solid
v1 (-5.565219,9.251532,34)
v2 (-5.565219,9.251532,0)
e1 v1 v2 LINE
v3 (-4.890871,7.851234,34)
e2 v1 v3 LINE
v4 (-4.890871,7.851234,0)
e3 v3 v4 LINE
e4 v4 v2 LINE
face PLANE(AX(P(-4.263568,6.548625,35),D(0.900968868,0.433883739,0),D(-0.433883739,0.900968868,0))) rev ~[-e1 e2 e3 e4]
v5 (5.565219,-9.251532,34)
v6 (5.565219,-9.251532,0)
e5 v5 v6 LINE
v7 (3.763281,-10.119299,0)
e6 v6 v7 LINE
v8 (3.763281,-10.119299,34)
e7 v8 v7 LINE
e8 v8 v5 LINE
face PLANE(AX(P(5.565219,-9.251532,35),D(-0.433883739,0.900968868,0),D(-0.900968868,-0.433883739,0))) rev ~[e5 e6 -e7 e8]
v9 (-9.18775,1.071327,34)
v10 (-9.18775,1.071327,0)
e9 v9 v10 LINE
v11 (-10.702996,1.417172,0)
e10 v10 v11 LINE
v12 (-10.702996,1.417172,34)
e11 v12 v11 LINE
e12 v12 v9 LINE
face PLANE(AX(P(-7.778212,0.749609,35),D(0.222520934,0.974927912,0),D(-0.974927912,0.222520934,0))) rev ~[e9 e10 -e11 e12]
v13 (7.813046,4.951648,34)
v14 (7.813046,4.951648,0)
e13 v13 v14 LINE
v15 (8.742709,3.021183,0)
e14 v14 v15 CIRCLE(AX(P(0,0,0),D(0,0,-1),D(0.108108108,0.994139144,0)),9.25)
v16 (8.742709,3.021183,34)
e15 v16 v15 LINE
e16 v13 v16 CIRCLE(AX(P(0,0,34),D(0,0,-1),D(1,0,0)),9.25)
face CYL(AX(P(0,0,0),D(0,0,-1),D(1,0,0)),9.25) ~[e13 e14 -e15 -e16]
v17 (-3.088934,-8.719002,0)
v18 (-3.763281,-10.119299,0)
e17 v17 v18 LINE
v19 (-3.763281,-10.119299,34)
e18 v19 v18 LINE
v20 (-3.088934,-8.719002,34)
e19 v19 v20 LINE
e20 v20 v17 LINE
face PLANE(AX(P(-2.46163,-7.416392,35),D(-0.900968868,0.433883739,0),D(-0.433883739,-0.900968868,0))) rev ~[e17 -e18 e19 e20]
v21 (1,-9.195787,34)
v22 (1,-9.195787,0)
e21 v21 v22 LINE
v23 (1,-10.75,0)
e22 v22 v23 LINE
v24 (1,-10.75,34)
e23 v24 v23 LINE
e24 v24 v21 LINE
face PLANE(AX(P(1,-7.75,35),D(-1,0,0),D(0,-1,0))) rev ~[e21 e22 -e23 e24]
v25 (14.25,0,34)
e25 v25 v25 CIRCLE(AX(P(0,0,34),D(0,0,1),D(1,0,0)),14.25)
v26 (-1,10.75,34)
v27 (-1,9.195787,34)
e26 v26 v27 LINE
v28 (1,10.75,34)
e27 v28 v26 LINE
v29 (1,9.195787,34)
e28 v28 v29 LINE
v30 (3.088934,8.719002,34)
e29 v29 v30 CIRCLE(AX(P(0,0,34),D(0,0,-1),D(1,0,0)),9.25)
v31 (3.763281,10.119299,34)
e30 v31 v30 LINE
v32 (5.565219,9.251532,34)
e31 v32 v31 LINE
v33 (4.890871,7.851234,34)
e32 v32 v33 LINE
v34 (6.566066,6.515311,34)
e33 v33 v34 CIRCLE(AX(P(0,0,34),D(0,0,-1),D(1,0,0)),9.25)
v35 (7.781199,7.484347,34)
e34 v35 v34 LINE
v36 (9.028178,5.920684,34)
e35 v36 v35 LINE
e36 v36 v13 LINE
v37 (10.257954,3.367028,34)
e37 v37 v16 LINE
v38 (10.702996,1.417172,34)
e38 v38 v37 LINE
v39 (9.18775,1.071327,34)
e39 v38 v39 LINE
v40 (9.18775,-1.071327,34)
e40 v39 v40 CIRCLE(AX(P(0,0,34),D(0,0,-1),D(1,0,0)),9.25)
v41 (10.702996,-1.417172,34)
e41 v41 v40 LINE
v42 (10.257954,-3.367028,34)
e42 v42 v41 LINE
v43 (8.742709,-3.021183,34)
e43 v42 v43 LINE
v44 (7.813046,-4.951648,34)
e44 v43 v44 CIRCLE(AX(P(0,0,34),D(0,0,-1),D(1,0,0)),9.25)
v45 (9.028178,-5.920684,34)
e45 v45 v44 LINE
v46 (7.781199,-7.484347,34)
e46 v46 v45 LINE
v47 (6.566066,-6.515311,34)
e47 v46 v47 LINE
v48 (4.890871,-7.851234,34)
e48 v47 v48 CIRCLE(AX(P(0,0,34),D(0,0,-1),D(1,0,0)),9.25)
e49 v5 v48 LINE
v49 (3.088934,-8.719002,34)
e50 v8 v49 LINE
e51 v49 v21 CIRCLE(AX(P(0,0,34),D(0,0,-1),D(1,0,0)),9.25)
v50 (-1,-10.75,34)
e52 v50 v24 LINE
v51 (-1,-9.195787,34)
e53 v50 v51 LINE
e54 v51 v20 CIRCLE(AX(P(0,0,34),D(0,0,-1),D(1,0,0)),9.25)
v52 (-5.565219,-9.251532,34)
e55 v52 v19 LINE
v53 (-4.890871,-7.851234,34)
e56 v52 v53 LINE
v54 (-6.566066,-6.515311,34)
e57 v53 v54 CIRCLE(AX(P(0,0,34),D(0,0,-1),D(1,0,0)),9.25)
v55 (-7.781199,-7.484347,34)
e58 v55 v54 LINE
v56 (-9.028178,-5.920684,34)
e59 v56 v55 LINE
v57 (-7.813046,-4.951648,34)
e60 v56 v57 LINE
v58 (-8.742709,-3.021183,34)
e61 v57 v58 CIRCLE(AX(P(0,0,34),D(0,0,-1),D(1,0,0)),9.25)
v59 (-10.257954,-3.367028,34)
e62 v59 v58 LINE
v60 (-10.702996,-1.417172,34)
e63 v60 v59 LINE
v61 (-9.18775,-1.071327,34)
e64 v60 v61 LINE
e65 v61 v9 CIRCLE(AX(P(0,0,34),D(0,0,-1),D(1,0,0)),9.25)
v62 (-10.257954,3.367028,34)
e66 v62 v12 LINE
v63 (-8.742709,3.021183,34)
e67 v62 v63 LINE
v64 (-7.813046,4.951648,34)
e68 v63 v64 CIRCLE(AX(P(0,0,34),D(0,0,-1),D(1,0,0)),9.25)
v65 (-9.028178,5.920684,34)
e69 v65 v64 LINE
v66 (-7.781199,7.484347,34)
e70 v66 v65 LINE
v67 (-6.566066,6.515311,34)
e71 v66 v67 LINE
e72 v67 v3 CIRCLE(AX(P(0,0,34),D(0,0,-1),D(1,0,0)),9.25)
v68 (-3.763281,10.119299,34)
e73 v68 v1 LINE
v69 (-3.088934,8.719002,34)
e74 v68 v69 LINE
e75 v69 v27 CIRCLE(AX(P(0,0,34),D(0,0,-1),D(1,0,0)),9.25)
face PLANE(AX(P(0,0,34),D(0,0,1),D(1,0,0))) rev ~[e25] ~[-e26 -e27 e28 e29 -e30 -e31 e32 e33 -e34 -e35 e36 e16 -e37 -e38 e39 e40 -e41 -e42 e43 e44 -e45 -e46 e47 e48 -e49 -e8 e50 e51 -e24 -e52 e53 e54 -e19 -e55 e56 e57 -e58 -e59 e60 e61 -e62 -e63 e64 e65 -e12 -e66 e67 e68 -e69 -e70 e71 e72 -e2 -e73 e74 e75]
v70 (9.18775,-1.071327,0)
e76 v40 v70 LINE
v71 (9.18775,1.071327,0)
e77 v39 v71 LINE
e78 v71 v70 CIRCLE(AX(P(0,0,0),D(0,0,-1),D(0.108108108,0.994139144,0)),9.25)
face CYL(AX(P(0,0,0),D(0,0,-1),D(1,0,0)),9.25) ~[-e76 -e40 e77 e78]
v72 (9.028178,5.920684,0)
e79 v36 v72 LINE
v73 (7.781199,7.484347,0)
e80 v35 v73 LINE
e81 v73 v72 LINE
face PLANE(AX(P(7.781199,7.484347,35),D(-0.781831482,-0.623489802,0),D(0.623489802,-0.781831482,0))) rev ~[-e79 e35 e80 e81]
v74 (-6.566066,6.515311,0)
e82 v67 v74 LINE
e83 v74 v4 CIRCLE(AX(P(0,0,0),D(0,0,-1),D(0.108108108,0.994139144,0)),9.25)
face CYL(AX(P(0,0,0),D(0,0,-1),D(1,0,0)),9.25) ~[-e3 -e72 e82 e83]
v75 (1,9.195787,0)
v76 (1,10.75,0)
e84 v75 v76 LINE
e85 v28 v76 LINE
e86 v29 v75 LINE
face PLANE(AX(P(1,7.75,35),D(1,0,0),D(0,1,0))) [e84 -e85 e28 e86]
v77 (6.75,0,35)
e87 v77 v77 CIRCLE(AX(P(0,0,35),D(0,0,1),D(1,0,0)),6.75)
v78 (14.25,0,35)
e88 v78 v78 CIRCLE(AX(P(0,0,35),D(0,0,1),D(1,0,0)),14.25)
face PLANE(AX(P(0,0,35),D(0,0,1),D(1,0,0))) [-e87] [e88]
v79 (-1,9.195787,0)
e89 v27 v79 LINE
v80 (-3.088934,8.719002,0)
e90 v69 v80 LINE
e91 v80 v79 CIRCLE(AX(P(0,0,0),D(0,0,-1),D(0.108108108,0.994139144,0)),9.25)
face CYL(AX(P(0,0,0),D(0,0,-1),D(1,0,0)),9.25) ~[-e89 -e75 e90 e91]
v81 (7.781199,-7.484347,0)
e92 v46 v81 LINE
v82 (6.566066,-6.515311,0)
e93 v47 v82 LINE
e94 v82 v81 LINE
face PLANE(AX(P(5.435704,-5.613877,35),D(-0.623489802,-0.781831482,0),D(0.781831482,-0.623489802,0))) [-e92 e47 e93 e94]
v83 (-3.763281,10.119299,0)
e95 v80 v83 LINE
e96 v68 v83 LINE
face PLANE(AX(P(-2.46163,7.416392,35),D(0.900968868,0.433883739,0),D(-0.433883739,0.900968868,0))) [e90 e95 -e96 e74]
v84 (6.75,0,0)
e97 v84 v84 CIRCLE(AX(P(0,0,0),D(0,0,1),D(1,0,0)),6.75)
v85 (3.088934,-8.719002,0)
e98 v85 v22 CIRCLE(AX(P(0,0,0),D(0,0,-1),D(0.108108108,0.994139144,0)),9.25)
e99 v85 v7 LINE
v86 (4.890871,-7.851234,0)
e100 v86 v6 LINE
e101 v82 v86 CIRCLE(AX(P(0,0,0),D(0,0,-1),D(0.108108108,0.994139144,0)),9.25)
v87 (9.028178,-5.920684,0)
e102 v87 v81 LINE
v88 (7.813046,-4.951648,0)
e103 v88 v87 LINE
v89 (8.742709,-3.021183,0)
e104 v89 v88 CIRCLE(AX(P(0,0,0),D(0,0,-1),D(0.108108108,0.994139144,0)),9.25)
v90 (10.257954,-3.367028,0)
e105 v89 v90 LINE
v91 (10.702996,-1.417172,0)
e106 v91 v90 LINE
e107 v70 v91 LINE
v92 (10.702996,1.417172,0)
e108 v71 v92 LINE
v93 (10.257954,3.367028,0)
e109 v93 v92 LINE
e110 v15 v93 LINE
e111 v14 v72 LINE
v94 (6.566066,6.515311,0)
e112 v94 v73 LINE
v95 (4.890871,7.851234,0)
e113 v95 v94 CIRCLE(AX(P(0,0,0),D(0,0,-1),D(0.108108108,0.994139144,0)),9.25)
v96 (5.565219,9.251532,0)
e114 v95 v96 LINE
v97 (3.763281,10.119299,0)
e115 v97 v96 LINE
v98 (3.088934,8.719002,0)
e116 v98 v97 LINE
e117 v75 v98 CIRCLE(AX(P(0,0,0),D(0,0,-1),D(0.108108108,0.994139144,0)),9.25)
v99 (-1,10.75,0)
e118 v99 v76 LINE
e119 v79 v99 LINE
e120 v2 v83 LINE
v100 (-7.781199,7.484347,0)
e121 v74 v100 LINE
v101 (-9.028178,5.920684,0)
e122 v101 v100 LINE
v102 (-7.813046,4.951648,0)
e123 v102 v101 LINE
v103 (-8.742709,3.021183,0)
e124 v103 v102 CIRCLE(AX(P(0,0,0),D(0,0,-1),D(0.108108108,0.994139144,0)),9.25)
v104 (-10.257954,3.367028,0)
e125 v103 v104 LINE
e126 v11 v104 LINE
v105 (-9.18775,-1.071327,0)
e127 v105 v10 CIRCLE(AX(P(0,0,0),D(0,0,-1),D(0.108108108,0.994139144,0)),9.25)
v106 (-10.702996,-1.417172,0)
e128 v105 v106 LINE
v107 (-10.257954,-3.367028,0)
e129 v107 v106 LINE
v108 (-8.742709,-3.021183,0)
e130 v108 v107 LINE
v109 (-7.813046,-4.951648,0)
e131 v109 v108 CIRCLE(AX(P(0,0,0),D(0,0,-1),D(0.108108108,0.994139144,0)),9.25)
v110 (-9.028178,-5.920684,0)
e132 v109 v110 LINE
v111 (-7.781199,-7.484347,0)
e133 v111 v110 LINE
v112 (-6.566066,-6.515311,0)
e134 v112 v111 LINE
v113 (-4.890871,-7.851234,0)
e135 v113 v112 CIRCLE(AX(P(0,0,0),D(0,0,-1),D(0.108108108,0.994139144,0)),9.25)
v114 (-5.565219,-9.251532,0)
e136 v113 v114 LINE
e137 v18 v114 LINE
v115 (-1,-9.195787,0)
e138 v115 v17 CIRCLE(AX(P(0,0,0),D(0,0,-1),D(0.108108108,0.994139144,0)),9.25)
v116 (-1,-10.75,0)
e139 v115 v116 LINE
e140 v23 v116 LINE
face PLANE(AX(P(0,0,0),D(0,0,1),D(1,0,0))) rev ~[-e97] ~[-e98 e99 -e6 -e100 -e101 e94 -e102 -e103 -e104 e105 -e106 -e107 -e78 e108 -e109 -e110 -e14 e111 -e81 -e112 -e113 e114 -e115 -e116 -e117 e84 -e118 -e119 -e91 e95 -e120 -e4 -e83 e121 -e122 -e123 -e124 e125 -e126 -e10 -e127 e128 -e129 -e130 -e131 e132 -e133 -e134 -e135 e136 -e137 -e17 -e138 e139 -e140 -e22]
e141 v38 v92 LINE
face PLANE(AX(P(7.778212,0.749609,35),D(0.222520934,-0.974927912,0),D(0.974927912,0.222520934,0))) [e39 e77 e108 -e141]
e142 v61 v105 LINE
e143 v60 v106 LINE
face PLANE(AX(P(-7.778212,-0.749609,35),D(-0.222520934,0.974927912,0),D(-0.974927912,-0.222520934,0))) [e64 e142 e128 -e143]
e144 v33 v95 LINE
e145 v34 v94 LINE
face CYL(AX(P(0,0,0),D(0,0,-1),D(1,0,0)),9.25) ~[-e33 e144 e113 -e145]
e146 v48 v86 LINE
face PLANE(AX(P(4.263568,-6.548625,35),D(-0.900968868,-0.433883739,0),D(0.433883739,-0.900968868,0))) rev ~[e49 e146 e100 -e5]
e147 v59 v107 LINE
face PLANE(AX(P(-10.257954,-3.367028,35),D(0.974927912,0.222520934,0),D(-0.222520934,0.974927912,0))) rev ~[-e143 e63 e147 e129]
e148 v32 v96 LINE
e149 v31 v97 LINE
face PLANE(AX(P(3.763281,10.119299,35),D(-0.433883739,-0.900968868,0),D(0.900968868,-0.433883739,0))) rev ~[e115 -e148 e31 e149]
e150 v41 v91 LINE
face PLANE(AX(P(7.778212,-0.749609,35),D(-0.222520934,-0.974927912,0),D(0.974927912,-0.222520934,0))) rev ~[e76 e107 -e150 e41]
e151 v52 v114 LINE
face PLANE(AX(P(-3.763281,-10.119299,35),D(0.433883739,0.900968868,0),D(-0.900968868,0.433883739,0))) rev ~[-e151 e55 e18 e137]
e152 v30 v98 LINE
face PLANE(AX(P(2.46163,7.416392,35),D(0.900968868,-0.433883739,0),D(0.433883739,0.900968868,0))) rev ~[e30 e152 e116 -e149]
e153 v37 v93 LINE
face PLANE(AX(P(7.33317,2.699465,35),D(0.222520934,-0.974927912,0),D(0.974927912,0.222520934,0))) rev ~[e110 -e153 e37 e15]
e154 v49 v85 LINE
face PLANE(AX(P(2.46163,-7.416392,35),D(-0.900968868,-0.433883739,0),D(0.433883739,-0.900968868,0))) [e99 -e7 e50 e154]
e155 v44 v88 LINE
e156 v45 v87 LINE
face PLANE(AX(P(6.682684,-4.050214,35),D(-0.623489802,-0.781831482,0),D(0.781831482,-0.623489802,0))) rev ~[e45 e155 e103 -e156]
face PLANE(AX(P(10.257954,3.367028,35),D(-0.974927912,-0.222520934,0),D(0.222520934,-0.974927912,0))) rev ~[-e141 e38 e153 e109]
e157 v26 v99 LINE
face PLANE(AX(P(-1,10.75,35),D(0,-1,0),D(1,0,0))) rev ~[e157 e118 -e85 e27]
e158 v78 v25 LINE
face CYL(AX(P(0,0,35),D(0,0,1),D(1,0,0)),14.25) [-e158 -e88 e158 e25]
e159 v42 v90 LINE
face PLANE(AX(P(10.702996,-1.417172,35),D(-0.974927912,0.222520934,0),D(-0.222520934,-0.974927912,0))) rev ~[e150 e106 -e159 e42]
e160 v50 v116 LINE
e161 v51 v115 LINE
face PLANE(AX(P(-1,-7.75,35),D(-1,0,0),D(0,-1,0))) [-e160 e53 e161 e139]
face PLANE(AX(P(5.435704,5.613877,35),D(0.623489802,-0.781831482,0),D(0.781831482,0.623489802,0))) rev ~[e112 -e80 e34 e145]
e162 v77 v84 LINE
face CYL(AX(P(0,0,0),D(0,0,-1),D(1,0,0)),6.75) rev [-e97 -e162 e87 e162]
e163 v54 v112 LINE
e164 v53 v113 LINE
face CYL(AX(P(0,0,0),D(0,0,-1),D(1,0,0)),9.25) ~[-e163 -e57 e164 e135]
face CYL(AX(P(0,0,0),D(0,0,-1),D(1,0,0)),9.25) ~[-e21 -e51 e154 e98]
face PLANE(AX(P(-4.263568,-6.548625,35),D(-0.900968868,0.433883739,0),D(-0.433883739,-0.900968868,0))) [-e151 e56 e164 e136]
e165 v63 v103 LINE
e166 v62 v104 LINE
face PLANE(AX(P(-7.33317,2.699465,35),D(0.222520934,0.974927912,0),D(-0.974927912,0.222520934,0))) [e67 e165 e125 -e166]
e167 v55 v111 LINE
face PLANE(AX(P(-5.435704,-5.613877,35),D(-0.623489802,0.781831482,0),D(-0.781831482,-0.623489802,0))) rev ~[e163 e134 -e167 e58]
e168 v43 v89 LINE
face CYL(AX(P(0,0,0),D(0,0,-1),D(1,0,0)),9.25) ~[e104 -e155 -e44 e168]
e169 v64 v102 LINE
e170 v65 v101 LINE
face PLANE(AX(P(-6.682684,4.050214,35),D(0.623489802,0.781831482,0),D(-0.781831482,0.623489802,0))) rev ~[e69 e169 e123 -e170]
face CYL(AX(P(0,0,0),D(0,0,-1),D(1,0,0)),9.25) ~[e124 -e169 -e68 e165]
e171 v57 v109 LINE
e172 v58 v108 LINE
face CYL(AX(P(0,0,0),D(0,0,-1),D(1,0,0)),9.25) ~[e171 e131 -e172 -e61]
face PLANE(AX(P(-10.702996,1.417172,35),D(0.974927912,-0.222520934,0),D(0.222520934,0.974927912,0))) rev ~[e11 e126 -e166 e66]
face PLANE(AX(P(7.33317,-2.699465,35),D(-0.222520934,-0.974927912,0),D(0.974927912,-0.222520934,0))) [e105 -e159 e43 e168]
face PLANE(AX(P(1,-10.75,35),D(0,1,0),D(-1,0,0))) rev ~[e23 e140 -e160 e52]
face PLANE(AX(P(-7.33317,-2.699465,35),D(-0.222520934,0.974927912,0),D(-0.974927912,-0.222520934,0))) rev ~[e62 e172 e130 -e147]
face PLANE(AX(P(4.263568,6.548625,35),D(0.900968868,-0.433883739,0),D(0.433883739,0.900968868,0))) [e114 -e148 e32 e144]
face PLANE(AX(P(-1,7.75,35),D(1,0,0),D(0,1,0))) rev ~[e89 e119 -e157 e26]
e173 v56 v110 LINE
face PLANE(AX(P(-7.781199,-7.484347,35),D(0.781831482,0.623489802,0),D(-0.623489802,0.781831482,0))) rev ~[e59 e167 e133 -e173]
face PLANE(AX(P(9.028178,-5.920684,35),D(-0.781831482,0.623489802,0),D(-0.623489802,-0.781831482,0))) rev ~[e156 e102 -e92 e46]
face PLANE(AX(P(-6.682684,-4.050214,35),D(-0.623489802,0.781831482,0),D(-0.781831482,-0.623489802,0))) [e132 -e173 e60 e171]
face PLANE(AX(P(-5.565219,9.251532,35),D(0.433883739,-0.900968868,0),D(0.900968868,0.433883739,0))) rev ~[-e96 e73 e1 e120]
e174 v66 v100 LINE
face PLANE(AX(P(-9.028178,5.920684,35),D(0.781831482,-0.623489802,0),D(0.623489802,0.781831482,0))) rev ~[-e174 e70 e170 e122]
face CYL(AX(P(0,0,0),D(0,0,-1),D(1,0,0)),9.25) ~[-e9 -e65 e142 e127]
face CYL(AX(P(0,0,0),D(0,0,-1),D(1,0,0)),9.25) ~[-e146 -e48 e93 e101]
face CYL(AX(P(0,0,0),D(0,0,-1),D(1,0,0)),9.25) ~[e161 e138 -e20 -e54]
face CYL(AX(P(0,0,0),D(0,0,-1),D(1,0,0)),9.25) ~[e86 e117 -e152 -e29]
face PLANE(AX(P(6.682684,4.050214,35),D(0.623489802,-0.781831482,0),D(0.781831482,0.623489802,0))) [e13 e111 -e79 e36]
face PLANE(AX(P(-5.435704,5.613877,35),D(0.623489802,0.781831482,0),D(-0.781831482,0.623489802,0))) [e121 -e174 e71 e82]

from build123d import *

# Parameters (mm, degrees)
F0_R            = 9.25
F0_R_2          = 6.75
F1_DEPTH        = 35
F2_W            = 2
F2_H            = 3
F3_DEPTH        = 35
F3_COPIES_COUNT = 14
F4_R            = 14.25
F4_R_2          = 6.75
F5_DEPTH        = 1


# Not quite as in the source:
# - a pattern or mirror of a feature is missing from the dataset's text; its kind, count and spacing are read off the source's solid


with BuildPart() as f1:
    # F0 (on Top) → F1 (new body)
    with BuildSketch(Plane.XY):
        Circle(F0_R)
        Circle(F0_R_2, mode=Mode.SUBTRACT)
    extrude(amount=F1_DEPTH)

    # F2 (on face) → F3 (join)
    with BuildSketch(Plane.XY.offset(35)):
        with Locations((0, 9.25)):
            Rectangle(F2_W, F2_H)
    f3 = extrude(amount=-F3_DEPTH)

    # F3_copies: F3 ×14 about axis
    f3_copies_axis = Axis((0, 0, 0), (0, 0, 1))
    for i in range(1, F3_COPIES_COUNT):
        add(f3.rotate(f3_copies_axis, i * 360 / F3_COPIES_COUNT))

    # F4 (on face) → F5 (join)
    with BuildSketch(Plane.XY.offset(35)):
        Circle(F4_R)
        Circle(F4_R_2, mode=Mode.SUBTRACT)
    extrude(amount=-F5_DEPTH)


solid = f1.part
